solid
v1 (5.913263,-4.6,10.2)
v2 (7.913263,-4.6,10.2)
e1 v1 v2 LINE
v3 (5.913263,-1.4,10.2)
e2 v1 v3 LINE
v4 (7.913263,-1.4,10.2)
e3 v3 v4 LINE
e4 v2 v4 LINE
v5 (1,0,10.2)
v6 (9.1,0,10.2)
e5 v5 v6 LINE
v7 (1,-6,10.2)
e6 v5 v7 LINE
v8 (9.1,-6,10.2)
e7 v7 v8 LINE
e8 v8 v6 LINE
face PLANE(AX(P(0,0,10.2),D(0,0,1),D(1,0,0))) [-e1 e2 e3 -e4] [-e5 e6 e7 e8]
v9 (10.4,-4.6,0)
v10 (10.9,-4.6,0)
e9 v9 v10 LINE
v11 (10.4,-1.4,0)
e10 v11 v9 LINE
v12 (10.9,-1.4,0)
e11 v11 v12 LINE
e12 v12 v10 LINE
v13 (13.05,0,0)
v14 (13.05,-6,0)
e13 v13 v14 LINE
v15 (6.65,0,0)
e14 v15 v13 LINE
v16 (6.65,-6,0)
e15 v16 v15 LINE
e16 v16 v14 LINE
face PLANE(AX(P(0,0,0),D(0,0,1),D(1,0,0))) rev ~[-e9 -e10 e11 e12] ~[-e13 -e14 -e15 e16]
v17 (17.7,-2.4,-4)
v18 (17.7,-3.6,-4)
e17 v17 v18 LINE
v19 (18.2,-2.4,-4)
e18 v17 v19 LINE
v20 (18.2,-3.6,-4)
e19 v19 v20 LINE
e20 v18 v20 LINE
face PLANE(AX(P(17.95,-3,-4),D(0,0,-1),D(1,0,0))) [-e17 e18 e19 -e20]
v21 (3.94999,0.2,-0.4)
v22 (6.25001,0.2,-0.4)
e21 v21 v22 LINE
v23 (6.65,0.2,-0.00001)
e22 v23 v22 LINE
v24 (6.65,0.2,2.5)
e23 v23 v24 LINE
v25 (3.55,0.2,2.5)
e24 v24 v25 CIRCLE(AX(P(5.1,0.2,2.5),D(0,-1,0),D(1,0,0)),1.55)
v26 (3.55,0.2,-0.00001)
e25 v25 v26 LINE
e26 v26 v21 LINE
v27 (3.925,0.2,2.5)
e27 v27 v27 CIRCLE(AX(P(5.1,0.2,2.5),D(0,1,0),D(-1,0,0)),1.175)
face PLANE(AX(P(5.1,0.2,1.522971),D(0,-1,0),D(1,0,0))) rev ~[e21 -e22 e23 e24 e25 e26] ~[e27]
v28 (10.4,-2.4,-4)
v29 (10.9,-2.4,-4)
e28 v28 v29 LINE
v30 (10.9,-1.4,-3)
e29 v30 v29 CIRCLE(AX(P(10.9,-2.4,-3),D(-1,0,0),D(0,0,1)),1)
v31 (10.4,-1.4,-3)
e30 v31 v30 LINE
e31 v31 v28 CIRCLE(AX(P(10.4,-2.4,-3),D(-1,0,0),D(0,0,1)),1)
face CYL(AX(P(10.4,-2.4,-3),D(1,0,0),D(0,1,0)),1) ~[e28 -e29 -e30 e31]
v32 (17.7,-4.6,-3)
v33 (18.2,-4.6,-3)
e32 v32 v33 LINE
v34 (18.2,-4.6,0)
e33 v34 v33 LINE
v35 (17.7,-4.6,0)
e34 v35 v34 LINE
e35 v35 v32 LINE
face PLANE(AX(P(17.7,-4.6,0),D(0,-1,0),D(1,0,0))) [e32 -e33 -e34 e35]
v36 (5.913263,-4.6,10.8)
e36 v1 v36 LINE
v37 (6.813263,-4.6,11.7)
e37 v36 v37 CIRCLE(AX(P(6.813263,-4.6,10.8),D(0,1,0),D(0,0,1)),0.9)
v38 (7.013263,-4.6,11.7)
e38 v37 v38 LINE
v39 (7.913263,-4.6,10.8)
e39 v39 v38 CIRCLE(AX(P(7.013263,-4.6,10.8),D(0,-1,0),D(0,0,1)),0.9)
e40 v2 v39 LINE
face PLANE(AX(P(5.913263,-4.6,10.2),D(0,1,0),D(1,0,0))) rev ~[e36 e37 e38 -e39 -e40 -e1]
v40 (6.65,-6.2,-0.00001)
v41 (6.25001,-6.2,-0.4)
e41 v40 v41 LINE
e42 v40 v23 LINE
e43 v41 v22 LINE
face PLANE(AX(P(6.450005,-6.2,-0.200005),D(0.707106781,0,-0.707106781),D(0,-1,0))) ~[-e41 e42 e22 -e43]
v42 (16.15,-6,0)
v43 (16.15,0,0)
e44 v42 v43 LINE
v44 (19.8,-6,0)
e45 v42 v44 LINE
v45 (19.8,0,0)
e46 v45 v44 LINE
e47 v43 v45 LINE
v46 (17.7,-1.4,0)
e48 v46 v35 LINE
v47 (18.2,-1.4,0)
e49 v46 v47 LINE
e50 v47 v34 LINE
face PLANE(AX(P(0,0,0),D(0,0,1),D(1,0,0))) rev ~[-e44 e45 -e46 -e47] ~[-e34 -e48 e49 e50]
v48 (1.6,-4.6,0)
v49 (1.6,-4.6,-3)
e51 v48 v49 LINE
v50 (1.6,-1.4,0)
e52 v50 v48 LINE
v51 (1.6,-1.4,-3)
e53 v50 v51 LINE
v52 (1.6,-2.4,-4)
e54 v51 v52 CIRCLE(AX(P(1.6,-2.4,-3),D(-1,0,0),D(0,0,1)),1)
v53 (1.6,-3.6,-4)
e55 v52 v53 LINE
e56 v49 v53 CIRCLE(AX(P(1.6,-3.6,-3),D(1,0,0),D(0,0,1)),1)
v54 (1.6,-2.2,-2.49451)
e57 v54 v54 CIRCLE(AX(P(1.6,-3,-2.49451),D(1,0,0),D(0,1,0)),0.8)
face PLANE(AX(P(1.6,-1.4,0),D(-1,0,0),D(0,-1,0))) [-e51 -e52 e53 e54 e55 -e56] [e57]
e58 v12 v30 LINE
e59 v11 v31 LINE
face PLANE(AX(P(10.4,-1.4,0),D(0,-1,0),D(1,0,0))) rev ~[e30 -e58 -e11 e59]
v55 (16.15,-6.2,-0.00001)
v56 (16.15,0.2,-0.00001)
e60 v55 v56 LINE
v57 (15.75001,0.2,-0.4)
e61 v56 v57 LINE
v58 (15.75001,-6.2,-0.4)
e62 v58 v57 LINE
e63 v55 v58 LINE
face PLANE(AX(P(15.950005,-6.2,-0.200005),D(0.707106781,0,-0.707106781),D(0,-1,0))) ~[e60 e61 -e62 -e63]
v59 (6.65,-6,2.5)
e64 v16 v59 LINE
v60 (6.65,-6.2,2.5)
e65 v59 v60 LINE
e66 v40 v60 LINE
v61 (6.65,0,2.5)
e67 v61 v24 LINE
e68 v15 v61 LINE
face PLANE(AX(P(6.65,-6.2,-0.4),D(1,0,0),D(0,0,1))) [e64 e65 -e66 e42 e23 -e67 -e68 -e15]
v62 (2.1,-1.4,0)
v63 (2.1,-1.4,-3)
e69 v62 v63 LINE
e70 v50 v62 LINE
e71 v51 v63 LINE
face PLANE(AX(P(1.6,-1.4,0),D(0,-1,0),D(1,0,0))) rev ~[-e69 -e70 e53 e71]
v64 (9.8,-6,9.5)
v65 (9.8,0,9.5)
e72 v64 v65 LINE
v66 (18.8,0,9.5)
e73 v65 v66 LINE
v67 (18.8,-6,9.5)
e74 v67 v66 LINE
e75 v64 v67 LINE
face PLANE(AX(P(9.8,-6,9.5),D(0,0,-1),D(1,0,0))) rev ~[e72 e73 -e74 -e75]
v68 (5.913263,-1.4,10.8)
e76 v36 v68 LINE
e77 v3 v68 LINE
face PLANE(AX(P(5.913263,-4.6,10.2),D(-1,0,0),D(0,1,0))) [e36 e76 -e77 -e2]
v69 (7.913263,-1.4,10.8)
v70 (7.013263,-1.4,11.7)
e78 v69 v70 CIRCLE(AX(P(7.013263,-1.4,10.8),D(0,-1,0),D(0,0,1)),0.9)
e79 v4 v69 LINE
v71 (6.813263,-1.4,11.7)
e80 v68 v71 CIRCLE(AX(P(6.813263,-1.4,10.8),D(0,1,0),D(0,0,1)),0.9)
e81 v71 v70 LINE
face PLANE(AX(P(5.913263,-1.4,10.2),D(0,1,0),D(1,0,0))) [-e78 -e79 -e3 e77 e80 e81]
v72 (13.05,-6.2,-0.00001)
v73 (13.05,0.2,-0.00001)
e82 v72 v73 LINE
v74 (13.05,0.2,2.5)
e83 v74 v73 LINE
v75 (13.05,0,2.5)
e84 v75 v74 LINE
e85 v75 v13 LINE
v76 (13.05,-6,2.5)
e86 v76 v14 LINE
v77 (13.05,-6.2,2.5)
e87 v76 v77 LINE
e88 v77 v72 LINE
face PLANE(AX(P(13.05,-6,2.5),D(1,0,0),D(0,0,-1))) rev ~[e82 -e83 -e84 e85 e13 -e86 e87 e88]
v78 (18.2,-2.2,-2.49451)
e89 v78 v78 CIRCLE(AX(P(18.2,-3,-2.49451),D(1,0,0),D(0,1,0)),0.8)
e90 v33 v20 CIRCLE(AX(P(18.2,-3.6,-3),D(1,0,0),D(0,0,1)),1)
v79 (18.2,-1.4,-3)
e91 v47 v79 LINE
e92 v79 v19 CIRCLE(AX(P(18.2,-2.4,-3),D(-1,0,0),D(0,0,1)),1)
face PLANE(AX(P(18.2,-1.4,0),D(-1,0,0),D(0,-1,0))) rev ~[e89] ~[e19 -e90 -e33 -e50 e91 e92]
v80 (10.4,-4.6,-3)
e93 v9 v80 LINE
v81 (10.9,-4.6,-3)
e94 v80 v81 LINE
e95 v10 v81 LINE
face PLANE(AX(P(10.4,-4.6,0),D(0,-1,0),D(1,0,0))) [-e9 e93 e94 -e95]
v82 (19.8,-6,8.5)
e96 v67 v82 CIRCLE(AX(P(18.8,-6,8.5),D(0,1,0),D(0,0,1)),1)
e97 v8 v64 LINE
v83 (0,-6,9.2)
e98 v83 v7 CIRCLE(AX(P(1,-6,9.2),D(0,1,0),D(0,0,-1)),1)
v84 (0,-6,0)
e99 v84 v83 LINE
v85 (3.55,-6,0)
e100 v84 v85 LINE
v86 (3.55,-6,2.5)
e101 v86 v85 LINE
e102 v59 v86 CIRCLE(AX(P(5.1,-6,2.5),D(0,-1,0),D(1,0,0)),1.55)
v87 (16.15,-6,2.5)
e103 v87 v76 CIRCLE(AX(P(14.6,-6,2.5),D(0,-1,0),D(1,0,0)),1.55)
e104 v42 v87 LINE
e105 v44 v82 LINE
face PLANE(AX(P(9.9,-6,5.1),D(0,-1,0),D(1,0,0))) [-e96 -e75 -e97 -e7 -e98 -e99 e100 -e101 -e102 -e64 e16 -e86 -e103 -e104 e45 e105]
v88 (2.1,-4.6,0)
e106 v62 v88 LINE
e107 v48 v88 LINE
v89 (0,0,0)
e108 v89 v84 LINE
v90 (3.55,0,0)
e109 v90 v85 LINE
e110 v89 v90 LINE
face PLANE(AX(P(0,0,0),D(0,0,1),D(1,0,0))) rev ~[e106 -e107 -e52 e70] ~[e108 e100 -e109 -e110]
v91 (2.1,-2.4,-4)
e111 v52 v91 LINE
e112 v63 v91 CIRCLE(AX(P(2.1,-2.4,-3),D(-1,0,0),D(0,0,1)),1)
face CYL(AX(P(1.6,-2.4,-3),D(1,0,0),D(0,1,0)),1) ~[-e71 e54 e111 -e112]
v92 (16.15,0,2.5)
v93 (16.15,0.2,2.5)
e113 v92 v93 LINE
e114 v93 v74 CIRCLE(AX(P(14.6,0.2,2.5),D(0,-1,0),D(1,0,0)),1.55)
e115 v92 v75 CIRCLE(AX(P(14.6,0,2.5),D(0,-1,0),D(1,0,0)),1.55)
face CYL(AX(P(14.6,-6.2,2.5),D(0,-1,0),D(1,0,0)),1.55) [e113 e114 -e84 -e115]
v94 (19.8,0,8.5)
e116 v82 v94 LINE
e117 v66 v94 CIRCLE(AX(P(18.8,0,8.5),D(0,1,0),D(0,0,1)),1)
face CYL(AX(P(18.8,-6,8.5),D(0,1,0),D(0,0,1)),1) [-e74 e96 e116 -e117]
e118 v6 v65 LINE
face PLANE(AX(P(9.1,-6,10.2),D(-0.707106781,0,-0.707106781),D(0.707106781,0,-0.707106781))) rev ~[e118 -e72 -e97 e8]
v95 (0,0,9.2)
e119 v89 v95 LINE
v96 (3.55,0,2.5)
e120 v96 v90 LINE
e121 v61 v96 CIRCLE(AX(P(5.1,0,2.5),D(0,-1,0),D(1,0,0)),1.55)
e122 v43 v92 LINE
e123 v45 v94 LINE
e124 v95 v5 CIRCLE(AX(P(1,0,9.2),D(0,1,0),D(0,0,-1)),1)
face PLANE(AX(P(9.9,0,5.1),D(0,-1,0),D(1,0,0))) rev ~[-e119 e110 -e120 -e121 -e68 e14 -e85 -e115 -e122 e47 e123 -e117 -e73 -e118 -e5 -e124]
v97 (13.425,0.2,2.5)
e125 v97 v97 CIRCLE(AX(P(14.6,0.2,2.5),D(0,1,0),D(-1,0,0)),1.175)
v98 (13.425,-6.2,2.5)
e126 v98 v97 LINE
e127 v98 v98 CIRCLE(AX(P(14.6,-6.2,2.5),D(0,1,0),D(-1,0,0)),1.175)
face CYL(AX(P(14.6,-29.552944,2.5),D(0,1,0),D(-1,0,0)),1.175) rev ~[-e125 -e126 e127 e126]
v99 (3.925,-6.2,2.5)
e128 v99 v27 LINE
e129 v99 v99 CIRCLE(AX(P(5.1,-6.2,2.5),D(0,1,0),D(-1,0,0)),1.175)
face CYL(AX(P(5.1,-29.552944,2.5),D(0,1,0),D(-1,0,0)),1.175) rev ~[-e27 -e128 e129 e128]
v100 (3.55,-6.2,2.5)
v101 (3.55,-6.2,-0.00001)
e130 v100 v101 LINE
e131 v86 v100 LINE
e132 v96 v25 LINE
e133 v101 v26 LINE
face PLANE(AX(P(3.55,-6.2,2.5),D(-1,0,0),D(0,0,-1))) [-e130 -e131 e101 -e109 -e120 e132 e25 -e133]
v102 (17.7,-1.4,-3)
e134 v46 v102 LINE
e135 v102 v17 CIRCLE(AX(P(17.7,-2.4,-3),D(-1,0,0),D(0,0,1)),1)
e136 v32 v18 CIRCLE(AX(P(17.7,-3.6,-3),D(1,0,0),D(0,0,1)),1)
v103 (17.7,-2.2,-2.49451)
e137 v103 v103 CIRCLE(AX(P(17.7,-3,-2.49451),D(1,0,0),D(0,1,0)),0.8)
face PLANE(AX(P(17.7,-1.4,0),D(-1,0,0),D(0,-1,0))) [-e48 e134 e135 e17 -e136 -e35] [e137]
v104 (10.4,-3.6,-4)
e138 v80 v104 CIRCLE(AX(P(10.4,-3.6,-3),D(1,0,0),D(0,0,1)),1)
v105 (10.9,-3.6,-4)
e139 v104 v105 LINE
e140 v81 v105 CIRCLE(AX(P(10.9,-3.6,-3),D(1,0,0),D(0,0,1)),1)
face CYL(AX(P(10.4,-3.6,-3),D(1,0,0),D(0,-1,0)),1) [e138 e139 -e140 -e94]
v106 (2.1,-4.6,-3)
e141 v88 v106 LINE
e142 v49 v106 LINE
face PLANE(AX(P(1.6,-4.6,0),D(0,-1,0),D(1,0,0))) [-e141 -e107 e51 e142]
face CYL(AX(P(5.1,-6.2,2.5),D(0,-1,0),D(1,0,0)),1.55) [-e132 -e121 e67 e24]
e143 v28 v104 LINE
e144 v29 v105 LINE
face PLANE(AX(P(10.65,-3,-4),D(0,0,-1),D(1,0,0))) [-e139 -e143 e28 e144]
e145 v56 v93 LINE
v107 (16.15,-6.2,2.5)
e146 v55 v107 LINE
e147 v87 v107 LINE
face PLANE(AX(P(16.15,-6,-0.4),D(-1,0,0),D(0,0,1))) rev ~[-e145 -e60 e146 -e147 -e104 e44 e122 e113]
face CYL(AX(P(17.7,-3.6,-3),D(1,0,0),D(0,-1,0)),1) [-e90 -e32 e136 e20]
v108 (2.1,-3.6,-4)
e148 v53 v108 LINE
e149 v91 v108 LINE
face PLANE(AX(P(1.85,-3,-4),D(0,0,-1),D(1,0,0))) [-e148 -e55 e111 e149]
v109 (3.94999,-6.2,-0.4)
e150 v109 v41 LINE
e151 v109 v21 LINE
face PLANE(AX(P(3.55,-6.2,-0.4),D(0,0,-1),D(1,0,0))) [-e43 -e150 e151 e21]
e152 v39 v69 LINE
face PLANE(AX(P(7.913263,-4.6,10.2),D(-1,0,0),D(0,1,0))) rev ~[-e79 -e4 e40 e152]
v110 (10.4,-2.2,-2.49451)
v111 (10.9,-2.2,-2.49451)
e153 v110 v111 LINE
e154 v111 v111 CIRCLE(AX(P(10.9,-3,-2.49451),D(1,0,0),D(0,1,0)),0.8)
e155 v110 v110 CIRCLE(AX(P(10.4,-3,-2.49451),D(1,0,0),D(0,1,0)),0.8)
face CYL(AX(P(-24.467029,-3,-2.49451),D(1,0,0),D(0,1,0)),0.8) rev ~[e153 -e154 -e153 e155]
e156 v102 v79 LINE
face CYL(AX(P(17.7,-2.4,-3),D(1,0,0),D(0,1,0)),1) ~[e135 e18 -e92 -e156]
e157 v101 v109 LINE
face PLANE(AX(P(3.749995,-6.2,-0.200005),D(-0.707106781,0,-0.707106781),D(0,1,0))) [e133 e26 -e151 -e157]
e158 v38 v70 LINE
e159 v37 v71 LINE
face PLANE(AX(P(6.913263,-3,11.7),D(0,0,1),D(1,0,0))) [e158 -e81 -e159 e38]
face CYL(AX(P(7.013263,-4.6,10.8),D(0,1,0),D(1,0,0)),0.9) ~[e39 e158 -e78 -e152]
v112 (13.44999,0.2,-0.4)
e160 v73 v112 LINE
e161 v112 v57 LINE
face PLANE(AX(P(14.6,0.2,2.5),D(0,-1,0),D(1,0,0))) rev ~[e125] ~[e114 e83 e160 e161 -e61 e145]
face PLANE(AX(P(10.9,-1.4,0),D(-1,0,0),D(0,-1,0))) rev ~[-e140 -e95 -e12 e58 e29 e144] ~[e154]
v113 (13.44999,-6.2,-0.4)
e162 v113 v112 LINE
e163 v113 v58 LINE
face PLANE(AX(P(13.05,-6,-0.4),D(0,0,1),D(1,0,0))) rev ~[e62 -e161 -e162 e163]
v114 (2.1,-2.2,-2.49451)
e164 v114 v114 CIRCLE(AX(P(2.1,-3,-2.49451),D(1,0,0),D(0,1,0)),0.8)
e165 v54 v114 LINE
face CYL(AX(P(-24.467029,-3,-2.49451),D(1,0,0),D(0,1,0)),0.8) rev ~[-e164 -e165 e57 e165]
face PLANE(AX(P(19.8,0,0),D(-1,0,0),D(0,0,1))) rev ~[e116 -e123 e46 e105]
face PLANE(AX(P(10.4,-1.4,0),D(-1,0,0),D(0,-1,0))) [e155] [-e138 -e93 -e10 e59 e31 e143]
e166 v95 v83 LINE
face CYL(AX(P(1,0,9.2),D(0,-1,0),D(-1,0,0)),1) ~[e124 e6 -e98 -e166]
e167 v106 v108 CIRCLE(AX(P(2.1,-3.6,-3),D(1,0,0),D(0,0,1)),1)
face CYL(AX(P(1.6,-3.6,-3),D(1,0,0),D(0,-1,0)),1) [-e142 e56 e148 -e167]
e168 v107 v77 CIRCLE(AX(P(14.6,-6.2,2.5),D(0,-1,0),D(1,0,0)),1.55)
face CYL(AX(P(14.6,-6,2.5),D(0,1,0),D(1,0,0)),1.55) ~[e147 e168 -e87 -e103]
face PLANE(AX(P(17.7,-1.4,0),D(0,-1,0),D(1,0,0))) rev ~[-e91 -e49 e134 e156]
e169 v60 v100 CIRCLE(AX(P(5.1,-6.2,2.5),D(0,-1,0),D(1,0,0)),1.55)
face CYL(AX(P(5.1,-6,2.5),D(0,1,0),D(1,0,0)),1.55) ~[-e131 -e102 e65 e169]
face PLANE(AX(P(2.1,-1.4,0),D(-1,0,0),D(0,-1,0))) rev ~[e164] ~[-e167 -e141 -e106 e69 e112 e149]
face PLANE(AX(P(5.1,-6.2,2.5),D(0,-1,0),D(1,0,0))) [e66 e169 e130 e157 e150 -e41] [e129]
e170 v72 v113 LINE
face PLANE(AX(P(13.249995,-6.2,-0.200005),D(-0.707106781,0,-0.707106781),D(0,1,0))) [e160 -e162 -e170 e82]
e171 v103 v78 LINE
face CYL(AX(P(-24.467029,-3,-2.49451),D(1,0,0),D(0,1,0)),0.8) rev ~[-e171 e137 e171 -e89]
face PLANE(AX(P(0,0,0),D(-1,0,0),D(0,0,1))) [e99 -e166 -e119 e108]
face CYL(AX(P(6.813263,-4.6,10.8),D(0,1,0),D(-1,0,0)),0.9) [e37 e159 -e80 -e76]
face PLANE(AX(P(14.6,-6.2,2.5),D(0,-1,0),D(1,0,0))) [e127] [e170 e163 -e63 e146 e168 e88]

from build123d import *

# Parameters (mm, degrees)
F0_W      = 19.8
F0_H      = 10.2
F1_DEPTH  = 6
F3_DEPTH  = 0.2
F5_DEPTH  = 6.4
F6_DEPTH  = 6.4
F7_SIZE   = 0.39999
F9_DEPTH  = 6.201
F10_R     = 1
F12_D     = 2.35
F14_D     = 2.35
F15_W     = 2
F15_H     = 3.2
F16_DEPTH = 1.5
F17_R     = 0.9
F18_W     = 0.5
F18_H     = 3.2
F19_DEPTH = 4
F21_D     = 1.6
F22_R     = 1


# Not quite as in the source:
# - a fillet or chamfer is up to 0.001 mm smaller than in the source, because OpenCascade refuses the exact size


with BuildPart() as f1:
    # F0 (on Front) → F1 (new body)
    with BuildSketch(Plane.XZ):
        with Locations((9.9, 5.1)):
            Rectangle(F0_W, F0_H)
    extrude(amount=F1_DEPTH)

    # F2 (on face) → F3 (join)
    with BuildSketch(Plane.XZ.offset(6)):
        with BuildLine():
            ThreePointArc((3.55, 2.5), (5.1, 0.95), (6.65, 2.5))
            ThreePointArc((6.65, 2.5), (5.1, 4.05), (3.55, 2.5))
        make_face()
        with BuildLine():
            Line((6.65, -0.4), (6.65, 2.5))
            ThreePointArc((6.65, 2.5), (5.1, 0.95), (3.55, 2.5))
            Line((3.55, 2.5), (3.55, -0.4))
            Line((3.55, -0.4), (6.65, -0.4))
        make_face()
        with BuildLine():
            ThreePointArc((13.05, 2.5), (14.6, 0.95), (16.15, 2.5))
            ThreePointArc((16.15, 2.5), (14.6, 4.05), (13.05, 2.5))
        make_face()
        with BuildLine():
            Line((16.15, -0.4), (16.15, 2.5))
            ThreePointArc((16.15, 2.5), (14.6, 0.95), (13.05, 2.5))
            Line((13.05, 2.5), (13.05, -0.4))
            Line((13.05, -0.4), (16.15, -0.4))
        make_face()
    extrude(amount=F3_DEPTH)

    # F4 (on face) → F5 (join)
    with BuildSketch(Plane.XZ.offset(6.2)):
        with BuildLine():
            Line((6.65, -0.4), (6.65, 2.5))
            ThreePointArc((6.65, 2.5), (5.1, 4.05), (3.55, 2.5))
            Line((3.55, 2.5), (3.55, -0.4))
            Line((3.55, -0.4), (6.65, -0.4))
        make_face()
    extrude(amount=-F5_DEPTH)

    # F6 (add): a face of the model
    f6_faces = [f1.faces().sort_by_distance(p)[0] for p in [
        (14.6, -6.2, 1.6732176073),
    ]]
    extrude(f6_faces, amount=-F6_DEPTH)

    # F7 (size 0.4 in the source; OpenCascade refuses exactly that, so slightly less here)
    f7_edges = [f1.edges().sort_by_distance(p)[0] for p in [
        (3.55, -3, -0.4),
        (6.65, -3, -0.4),
        (13.05, -3, -0.4),
        (16.15, -3, -0.4),
    ]]
    chamfer(f7_edges, length=F7_SIZE)

    # F8 (on face) → F9 (cut, through all)
    with BuildSketch(Plane.XZ.offset(6)):
        Polygon((19.8, 10.2), (9.1, 10.2), (9.8, 9.5), (19.8, 9.5), align=None)
    extrude(amount=-F9_DEPTH, mode=Mode.SUBTRACT)

    # F10
    f10_edges = [f1.edges().sort_by_distance(p)[0] for p in [
        (0, -3, 10.2),
        (19.8, -3, 9.5),
    ]]
    fillet(f10_edges, radius=F10_R)

    # F12 (through all)
    with Locations(Plane.XZ.offset(6.2)):
        with Locations((5.1, 2.5)):
            Hole(F12_D / 2)

    # F14 (through all)
    with Locations(Plane.XZ.offset(6.2)):
        with Locations((14.6, 2.5)):
            Hole(F14_D / 2)

    # F15 (on face) → F16 (join)
    with BuildSketch(Plane.XY.offset(10.2)):
        with Locations((6.9132626522, -3)):
            Rectangle(F15_W, F15_H)
    extrude(amount=F16_DEPTH)

    # F17
    f17_edges = [f1.edges().sort_by_distance(p)[0] for p in [
        (5.913263, -3, 11.7),
        (7.913263, -3, 11.7),
    ]]
    fillet(f17_edges, radius=F17_R)

    # F18 (on face) → F19 (join)
    with BuildSketch(Plane(origin=(0, 0, 0), x_dir=(1, 0, 0), z_dir=(0, 0, -1))):
        with Locations((1.85, 3)):
            Rectangle(F18_W, F18_H)
        with Locations((10.65, 3)):
            Rectangle(F18_W, F18_H)
        with Locations((17.95, 3)):
            Rectangle(F18_W, F18_H)
    extrude(amount=F19_DEPTH)

    # F21 (through all)
    with Locations(Plane(origin=(1.6, 0, 0), x_dir=(0, -1, 0), z_dir=(-1, 0, 0))):
        with Locations((3, -2.4945095647)):
            Hole(F21_D / 2)

    # F22
    f22_edges = [f1.edges().sort_by_distance(p)[0] for p in [
        (17.95, -4.6, -4),
        (10.65, -4.6, -4),
        (1.85, -4.6, -4),
        (1.85, -1.4, -4),
        (10.65, -1.4, -4),
        (17.95, -1.4, -4),
    ]]
    fillet(f22_edges, radius=F22_R)


solid = f1.part
